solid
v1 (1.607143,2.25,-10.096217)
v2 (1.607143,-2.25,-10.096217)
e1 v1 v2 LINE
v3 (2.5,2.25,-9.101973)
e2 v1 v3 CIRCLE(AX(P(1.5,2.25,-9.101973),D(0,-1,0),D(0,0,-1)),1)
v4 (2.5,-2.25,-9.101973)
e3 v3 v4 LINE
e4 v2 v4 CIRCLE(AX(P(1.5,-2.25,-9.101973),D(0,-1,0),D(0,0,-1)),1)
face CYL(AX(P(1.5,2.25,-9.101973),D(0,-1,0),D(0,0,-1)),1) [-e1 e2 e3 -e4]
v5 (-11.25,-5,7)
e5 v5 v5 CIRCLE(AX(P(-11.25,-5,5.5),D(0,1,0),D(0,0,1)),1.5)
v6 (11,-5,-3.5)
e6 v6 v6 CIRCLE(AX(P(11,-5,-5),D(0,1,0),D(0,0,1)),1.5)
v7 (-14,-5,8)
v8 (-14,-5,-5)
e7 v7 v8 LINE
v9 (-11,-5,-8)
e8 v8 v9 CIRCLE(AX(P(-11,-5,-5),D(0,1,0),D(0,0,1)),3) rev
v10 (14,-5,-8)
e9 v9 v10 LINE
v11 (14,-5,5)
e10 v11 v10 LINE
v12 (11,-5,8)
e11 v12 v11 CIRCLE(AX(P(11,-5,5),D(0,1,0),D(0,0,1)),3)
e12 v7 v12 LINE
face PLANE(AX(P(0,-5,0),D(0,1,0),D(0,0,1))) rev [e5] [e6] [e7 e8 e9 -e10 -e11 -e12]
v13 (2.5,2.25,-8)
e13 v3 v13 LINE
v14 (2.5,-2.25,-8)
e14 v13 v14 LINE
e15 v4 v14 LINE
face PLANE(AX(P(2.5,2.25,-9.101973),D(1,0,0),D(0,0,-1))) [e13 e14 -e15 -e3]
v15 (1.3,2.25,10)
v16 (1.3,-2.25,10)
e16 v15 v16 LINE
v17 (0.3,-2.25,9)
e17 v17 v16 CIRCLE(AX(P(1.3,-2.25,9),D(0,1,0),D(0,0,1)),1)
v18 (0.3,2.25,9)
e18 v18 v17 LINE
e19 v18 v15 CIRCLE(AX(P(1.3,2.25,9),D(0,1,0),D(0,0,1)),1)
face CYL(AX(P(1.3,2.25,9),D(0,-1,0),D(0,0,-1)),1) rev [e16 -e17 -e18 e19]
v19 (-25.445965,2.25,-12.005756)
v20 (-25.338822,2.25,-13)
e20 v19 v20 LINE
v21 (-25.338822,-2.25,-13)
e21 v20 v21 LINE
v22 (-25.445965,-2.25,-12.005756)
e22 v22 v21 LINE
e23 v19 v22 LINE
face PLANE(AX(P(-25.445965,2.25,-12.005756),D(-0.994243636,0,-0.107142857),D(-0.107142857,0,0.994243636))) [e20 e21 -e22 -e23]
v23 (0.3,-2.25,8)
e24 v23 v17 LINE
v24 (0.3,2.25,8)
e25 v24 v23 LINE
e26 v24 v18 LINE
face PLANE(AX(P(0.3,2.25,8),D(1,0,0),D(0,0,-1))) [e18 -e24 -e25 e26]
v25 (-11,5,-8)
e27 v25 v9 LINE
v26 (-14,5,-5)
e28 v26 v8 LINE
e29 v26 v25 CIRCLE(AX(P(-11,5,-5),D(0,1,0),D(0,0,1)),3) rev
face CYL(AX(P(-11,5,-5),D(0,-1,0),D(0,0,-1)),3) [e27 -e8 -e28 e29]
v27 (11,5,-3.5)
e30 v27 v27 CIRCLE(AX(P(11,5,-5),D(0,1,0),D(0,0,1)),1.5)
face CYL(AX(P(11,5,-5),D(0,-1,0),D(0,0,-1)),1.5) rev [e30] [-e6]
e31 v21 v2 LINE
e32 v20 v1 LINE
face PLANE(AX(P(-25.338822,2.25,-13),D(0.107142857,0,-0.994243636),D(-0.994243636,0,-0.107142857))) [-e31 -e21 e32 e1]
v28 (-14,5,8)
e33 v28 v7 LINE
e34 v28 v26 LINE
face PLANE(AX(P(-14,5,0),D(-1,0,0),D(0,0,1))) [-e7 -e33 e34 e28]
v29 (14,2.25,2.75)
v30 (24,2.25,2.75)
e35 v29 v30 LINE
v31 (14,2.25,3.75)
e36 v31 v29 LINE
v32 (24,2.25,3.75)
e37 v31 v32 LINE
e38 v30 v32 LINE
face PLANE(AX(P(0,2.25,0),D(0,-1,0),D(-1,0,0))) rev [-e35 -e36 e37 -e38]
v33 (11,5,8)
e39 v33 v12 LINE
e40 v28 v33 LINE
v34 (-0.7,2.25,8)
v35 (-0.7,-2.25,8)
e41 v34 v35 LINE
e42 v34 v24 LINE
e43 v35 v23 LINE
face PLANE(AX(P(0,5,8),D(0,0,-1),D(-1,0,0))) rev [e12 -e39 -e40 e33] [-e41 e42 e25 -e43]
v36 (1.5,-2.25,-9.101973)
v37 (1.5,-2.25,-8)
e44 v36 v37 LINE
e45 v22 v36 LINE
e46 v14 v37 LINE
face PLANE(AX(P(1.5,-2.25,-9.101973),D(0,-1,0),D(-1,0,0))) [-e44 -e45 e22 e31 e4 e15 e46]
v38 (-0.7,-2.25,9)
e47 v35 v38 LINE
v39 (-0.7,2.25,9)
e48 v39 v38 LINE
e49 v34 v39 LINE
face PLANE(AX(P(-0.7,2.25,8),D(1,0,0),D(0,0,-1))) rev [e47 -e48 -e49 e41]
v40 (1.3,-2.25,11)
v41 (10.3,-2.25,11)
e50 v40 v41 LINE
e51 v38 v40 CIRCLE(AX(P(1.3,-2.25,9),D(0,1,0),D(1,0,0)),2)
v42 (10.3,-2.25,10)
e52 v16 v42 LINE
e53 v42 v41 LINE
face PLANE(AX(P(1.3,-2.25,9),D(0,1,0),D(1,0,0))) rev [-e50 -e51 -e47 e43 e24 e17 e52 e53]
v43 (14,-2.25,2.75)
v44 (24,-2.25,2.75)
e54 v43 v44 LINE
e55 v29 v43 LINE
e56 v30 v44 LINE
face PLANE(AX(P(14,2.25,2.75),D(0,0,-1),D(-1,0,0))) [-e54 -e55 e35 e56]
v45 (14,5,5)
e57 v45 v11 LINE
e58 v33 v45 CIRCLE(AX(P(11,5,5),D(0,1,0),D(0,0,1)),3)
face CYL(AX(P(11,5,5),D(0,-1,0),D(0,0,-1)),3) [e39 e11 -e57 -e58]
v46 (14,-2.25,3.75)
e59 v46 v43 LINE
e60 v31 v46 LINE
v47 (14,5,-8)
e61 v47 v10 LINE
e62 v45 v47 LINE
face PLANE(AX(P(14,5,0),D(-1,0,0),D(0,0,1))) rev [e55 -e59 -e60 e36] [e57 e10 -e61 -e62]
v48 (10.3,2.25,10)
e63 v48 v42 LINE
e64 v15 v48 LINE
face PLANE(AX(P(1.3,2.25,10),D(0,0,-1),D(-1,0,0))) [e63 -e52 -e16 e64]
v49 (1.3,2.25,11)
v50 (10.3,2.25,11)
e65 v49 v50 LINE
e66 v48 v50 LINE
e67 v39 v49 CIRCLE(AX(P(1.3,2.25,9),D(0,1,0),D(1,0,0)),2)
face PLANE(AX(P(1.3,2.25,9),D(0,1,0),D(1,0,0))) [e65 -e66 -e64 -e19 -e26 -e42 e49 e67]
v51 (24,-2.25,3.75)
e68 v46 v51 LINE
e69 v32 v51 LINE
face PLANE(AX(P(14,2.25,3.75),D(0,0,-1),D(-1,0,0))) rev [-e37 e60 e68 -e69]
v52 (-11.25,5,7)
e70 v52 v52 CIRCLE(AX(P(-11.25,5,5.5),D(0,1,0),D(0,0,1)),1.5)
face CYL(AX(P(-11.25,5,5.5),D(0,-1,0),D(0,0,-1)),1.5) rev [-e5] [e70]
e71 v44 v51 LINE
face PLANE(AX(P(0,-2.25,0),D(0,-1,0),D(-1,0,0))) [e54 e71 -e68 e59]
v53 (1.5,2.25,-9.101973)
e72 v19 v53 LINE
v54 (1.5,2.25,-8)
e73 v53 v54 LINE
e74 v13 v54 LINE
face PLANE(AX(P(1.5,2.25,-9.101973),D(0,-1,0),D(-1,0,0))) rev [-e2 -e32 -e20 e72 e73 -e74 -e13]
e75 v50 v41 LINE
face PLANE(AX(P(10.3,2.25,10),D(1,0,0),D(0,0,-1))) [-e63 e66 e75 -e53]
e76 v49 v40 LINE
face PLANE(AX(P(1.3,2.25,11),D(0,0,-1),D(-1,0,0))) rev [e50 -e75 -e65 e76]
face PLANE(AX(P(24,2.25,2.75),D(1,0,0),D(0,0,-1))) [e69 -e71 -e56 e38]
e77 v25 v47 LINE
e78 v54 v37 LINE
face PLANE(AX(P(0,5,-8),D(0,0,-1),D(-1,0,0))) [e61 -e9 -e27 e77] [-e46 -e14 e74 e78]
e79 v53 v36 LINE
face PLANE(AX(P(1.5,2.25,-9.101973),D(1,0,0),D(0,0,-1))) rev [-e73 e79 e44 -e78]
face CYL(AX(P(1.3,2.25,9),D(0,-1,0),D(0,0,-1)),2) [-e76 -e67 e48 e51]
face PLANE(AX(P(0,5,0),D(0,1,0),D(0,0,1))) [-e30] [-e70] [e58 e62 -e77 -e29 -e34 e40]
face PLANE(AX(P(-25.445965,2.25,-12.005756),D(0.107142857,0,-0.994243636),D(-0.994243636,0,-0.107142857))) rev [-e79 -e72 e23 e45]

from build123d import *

# Parameters (mm, degrees)
SKETCH1_R           = 1.5
BOSS_EXTRUDE1_DEPTH = 5
SKETCH1_3_W         = 10
SKETCH1_3_H         = 1
EXTRUDE_THIN1_DEPTH = 2.25


with BuildPart() as part:
    # Sketch1 → Boss-Extrude1 (new, symmetric)
    with BuildSketch(Plane(origin=(0, 0, 0), x_dir=(1, 0, 0), z_dir=(0, 1, 0))):
        with BuildLine():
            Line((-14, 5), (-14, -8))
            Line((-14, -8), (0.3, -8))
            Line((0.3, -8), (11, -8))
            ThreePointArc((11, -8), (13.121320344, -7.121320344), (14, -5))
            Line((14, -5), (14, -2.75))
            Line((14, -2.75), (14, 8))
            Line((14, 8), (2.5, 8))
            Line((2.5, 8), (-11, 8))
            ThreePointArc((-11, 8), (-13.121320344, 7.121320344), (-14, 5))
        make_face()
        with Locations((-11.25, -5.5)):
            Circle(SKETCH1_R, mode=Mode.SUBTRACT)
        with Locations((11, 5)):
            Circle(SKETCH1_R, mode=Mode.SUBTRACT)
    extrude(amount=BOSS_EXTRUDE1_DEPTH, both=True)

    # Sketch1<3> → Extrude-Thin1 (add, symmetric)
    with BuildSketch(Plane(origin=(0, 0, 0), x_dir=(1, 0, 0), z_dir=(0, 1, 0))):
        with BuildLine():
            Line((-25.338821814, 13), (1.607142857, 10.096217126))
            ThreePointArc((1.607142857, 10.096217126), (2.244023809, 9.770126595), (2.5, 9.10197349))
            Line((2.5, 9.10197349), (2.5, 8))
            Line((2.5, 8), (1.5, 8))
            Line((1.5, 8), (1.5, 9.10197349))
            Line((1.5, 9.10197349), (-25.445964671, 12.005756364))
            Line((-25.445964671, 12.005756364), (-25.338821814, 13))
        make_face()
        with BuildLine():
            Line((0.3, -8), (0.3, -9))
            ThreePointArc((0.3, -9), (0.592893219, -9.707106781), (1.3, -10))
            Line((1.3, -10), (10.3, -10))
            Line((10.3, -10), (10.3, -11))
            Line((10.3, -11), (1.3, -11))
            ThreePointArc((1.3, -11), (-0.114213562, -10.414213562), (-0.7, -9))
            Line((-0.7, -9), (-0.7, -8))
            Line((-0.7, -8), (0.3, -8))
        make_face()
        with Locations((19, -3.25)):
            Rectangle(SKETCH1_3_W, SKETCH1_3_H)
    extrude(amount=EXTRUDE_THIN1_DEPTH, both=True)


solid = part.part
